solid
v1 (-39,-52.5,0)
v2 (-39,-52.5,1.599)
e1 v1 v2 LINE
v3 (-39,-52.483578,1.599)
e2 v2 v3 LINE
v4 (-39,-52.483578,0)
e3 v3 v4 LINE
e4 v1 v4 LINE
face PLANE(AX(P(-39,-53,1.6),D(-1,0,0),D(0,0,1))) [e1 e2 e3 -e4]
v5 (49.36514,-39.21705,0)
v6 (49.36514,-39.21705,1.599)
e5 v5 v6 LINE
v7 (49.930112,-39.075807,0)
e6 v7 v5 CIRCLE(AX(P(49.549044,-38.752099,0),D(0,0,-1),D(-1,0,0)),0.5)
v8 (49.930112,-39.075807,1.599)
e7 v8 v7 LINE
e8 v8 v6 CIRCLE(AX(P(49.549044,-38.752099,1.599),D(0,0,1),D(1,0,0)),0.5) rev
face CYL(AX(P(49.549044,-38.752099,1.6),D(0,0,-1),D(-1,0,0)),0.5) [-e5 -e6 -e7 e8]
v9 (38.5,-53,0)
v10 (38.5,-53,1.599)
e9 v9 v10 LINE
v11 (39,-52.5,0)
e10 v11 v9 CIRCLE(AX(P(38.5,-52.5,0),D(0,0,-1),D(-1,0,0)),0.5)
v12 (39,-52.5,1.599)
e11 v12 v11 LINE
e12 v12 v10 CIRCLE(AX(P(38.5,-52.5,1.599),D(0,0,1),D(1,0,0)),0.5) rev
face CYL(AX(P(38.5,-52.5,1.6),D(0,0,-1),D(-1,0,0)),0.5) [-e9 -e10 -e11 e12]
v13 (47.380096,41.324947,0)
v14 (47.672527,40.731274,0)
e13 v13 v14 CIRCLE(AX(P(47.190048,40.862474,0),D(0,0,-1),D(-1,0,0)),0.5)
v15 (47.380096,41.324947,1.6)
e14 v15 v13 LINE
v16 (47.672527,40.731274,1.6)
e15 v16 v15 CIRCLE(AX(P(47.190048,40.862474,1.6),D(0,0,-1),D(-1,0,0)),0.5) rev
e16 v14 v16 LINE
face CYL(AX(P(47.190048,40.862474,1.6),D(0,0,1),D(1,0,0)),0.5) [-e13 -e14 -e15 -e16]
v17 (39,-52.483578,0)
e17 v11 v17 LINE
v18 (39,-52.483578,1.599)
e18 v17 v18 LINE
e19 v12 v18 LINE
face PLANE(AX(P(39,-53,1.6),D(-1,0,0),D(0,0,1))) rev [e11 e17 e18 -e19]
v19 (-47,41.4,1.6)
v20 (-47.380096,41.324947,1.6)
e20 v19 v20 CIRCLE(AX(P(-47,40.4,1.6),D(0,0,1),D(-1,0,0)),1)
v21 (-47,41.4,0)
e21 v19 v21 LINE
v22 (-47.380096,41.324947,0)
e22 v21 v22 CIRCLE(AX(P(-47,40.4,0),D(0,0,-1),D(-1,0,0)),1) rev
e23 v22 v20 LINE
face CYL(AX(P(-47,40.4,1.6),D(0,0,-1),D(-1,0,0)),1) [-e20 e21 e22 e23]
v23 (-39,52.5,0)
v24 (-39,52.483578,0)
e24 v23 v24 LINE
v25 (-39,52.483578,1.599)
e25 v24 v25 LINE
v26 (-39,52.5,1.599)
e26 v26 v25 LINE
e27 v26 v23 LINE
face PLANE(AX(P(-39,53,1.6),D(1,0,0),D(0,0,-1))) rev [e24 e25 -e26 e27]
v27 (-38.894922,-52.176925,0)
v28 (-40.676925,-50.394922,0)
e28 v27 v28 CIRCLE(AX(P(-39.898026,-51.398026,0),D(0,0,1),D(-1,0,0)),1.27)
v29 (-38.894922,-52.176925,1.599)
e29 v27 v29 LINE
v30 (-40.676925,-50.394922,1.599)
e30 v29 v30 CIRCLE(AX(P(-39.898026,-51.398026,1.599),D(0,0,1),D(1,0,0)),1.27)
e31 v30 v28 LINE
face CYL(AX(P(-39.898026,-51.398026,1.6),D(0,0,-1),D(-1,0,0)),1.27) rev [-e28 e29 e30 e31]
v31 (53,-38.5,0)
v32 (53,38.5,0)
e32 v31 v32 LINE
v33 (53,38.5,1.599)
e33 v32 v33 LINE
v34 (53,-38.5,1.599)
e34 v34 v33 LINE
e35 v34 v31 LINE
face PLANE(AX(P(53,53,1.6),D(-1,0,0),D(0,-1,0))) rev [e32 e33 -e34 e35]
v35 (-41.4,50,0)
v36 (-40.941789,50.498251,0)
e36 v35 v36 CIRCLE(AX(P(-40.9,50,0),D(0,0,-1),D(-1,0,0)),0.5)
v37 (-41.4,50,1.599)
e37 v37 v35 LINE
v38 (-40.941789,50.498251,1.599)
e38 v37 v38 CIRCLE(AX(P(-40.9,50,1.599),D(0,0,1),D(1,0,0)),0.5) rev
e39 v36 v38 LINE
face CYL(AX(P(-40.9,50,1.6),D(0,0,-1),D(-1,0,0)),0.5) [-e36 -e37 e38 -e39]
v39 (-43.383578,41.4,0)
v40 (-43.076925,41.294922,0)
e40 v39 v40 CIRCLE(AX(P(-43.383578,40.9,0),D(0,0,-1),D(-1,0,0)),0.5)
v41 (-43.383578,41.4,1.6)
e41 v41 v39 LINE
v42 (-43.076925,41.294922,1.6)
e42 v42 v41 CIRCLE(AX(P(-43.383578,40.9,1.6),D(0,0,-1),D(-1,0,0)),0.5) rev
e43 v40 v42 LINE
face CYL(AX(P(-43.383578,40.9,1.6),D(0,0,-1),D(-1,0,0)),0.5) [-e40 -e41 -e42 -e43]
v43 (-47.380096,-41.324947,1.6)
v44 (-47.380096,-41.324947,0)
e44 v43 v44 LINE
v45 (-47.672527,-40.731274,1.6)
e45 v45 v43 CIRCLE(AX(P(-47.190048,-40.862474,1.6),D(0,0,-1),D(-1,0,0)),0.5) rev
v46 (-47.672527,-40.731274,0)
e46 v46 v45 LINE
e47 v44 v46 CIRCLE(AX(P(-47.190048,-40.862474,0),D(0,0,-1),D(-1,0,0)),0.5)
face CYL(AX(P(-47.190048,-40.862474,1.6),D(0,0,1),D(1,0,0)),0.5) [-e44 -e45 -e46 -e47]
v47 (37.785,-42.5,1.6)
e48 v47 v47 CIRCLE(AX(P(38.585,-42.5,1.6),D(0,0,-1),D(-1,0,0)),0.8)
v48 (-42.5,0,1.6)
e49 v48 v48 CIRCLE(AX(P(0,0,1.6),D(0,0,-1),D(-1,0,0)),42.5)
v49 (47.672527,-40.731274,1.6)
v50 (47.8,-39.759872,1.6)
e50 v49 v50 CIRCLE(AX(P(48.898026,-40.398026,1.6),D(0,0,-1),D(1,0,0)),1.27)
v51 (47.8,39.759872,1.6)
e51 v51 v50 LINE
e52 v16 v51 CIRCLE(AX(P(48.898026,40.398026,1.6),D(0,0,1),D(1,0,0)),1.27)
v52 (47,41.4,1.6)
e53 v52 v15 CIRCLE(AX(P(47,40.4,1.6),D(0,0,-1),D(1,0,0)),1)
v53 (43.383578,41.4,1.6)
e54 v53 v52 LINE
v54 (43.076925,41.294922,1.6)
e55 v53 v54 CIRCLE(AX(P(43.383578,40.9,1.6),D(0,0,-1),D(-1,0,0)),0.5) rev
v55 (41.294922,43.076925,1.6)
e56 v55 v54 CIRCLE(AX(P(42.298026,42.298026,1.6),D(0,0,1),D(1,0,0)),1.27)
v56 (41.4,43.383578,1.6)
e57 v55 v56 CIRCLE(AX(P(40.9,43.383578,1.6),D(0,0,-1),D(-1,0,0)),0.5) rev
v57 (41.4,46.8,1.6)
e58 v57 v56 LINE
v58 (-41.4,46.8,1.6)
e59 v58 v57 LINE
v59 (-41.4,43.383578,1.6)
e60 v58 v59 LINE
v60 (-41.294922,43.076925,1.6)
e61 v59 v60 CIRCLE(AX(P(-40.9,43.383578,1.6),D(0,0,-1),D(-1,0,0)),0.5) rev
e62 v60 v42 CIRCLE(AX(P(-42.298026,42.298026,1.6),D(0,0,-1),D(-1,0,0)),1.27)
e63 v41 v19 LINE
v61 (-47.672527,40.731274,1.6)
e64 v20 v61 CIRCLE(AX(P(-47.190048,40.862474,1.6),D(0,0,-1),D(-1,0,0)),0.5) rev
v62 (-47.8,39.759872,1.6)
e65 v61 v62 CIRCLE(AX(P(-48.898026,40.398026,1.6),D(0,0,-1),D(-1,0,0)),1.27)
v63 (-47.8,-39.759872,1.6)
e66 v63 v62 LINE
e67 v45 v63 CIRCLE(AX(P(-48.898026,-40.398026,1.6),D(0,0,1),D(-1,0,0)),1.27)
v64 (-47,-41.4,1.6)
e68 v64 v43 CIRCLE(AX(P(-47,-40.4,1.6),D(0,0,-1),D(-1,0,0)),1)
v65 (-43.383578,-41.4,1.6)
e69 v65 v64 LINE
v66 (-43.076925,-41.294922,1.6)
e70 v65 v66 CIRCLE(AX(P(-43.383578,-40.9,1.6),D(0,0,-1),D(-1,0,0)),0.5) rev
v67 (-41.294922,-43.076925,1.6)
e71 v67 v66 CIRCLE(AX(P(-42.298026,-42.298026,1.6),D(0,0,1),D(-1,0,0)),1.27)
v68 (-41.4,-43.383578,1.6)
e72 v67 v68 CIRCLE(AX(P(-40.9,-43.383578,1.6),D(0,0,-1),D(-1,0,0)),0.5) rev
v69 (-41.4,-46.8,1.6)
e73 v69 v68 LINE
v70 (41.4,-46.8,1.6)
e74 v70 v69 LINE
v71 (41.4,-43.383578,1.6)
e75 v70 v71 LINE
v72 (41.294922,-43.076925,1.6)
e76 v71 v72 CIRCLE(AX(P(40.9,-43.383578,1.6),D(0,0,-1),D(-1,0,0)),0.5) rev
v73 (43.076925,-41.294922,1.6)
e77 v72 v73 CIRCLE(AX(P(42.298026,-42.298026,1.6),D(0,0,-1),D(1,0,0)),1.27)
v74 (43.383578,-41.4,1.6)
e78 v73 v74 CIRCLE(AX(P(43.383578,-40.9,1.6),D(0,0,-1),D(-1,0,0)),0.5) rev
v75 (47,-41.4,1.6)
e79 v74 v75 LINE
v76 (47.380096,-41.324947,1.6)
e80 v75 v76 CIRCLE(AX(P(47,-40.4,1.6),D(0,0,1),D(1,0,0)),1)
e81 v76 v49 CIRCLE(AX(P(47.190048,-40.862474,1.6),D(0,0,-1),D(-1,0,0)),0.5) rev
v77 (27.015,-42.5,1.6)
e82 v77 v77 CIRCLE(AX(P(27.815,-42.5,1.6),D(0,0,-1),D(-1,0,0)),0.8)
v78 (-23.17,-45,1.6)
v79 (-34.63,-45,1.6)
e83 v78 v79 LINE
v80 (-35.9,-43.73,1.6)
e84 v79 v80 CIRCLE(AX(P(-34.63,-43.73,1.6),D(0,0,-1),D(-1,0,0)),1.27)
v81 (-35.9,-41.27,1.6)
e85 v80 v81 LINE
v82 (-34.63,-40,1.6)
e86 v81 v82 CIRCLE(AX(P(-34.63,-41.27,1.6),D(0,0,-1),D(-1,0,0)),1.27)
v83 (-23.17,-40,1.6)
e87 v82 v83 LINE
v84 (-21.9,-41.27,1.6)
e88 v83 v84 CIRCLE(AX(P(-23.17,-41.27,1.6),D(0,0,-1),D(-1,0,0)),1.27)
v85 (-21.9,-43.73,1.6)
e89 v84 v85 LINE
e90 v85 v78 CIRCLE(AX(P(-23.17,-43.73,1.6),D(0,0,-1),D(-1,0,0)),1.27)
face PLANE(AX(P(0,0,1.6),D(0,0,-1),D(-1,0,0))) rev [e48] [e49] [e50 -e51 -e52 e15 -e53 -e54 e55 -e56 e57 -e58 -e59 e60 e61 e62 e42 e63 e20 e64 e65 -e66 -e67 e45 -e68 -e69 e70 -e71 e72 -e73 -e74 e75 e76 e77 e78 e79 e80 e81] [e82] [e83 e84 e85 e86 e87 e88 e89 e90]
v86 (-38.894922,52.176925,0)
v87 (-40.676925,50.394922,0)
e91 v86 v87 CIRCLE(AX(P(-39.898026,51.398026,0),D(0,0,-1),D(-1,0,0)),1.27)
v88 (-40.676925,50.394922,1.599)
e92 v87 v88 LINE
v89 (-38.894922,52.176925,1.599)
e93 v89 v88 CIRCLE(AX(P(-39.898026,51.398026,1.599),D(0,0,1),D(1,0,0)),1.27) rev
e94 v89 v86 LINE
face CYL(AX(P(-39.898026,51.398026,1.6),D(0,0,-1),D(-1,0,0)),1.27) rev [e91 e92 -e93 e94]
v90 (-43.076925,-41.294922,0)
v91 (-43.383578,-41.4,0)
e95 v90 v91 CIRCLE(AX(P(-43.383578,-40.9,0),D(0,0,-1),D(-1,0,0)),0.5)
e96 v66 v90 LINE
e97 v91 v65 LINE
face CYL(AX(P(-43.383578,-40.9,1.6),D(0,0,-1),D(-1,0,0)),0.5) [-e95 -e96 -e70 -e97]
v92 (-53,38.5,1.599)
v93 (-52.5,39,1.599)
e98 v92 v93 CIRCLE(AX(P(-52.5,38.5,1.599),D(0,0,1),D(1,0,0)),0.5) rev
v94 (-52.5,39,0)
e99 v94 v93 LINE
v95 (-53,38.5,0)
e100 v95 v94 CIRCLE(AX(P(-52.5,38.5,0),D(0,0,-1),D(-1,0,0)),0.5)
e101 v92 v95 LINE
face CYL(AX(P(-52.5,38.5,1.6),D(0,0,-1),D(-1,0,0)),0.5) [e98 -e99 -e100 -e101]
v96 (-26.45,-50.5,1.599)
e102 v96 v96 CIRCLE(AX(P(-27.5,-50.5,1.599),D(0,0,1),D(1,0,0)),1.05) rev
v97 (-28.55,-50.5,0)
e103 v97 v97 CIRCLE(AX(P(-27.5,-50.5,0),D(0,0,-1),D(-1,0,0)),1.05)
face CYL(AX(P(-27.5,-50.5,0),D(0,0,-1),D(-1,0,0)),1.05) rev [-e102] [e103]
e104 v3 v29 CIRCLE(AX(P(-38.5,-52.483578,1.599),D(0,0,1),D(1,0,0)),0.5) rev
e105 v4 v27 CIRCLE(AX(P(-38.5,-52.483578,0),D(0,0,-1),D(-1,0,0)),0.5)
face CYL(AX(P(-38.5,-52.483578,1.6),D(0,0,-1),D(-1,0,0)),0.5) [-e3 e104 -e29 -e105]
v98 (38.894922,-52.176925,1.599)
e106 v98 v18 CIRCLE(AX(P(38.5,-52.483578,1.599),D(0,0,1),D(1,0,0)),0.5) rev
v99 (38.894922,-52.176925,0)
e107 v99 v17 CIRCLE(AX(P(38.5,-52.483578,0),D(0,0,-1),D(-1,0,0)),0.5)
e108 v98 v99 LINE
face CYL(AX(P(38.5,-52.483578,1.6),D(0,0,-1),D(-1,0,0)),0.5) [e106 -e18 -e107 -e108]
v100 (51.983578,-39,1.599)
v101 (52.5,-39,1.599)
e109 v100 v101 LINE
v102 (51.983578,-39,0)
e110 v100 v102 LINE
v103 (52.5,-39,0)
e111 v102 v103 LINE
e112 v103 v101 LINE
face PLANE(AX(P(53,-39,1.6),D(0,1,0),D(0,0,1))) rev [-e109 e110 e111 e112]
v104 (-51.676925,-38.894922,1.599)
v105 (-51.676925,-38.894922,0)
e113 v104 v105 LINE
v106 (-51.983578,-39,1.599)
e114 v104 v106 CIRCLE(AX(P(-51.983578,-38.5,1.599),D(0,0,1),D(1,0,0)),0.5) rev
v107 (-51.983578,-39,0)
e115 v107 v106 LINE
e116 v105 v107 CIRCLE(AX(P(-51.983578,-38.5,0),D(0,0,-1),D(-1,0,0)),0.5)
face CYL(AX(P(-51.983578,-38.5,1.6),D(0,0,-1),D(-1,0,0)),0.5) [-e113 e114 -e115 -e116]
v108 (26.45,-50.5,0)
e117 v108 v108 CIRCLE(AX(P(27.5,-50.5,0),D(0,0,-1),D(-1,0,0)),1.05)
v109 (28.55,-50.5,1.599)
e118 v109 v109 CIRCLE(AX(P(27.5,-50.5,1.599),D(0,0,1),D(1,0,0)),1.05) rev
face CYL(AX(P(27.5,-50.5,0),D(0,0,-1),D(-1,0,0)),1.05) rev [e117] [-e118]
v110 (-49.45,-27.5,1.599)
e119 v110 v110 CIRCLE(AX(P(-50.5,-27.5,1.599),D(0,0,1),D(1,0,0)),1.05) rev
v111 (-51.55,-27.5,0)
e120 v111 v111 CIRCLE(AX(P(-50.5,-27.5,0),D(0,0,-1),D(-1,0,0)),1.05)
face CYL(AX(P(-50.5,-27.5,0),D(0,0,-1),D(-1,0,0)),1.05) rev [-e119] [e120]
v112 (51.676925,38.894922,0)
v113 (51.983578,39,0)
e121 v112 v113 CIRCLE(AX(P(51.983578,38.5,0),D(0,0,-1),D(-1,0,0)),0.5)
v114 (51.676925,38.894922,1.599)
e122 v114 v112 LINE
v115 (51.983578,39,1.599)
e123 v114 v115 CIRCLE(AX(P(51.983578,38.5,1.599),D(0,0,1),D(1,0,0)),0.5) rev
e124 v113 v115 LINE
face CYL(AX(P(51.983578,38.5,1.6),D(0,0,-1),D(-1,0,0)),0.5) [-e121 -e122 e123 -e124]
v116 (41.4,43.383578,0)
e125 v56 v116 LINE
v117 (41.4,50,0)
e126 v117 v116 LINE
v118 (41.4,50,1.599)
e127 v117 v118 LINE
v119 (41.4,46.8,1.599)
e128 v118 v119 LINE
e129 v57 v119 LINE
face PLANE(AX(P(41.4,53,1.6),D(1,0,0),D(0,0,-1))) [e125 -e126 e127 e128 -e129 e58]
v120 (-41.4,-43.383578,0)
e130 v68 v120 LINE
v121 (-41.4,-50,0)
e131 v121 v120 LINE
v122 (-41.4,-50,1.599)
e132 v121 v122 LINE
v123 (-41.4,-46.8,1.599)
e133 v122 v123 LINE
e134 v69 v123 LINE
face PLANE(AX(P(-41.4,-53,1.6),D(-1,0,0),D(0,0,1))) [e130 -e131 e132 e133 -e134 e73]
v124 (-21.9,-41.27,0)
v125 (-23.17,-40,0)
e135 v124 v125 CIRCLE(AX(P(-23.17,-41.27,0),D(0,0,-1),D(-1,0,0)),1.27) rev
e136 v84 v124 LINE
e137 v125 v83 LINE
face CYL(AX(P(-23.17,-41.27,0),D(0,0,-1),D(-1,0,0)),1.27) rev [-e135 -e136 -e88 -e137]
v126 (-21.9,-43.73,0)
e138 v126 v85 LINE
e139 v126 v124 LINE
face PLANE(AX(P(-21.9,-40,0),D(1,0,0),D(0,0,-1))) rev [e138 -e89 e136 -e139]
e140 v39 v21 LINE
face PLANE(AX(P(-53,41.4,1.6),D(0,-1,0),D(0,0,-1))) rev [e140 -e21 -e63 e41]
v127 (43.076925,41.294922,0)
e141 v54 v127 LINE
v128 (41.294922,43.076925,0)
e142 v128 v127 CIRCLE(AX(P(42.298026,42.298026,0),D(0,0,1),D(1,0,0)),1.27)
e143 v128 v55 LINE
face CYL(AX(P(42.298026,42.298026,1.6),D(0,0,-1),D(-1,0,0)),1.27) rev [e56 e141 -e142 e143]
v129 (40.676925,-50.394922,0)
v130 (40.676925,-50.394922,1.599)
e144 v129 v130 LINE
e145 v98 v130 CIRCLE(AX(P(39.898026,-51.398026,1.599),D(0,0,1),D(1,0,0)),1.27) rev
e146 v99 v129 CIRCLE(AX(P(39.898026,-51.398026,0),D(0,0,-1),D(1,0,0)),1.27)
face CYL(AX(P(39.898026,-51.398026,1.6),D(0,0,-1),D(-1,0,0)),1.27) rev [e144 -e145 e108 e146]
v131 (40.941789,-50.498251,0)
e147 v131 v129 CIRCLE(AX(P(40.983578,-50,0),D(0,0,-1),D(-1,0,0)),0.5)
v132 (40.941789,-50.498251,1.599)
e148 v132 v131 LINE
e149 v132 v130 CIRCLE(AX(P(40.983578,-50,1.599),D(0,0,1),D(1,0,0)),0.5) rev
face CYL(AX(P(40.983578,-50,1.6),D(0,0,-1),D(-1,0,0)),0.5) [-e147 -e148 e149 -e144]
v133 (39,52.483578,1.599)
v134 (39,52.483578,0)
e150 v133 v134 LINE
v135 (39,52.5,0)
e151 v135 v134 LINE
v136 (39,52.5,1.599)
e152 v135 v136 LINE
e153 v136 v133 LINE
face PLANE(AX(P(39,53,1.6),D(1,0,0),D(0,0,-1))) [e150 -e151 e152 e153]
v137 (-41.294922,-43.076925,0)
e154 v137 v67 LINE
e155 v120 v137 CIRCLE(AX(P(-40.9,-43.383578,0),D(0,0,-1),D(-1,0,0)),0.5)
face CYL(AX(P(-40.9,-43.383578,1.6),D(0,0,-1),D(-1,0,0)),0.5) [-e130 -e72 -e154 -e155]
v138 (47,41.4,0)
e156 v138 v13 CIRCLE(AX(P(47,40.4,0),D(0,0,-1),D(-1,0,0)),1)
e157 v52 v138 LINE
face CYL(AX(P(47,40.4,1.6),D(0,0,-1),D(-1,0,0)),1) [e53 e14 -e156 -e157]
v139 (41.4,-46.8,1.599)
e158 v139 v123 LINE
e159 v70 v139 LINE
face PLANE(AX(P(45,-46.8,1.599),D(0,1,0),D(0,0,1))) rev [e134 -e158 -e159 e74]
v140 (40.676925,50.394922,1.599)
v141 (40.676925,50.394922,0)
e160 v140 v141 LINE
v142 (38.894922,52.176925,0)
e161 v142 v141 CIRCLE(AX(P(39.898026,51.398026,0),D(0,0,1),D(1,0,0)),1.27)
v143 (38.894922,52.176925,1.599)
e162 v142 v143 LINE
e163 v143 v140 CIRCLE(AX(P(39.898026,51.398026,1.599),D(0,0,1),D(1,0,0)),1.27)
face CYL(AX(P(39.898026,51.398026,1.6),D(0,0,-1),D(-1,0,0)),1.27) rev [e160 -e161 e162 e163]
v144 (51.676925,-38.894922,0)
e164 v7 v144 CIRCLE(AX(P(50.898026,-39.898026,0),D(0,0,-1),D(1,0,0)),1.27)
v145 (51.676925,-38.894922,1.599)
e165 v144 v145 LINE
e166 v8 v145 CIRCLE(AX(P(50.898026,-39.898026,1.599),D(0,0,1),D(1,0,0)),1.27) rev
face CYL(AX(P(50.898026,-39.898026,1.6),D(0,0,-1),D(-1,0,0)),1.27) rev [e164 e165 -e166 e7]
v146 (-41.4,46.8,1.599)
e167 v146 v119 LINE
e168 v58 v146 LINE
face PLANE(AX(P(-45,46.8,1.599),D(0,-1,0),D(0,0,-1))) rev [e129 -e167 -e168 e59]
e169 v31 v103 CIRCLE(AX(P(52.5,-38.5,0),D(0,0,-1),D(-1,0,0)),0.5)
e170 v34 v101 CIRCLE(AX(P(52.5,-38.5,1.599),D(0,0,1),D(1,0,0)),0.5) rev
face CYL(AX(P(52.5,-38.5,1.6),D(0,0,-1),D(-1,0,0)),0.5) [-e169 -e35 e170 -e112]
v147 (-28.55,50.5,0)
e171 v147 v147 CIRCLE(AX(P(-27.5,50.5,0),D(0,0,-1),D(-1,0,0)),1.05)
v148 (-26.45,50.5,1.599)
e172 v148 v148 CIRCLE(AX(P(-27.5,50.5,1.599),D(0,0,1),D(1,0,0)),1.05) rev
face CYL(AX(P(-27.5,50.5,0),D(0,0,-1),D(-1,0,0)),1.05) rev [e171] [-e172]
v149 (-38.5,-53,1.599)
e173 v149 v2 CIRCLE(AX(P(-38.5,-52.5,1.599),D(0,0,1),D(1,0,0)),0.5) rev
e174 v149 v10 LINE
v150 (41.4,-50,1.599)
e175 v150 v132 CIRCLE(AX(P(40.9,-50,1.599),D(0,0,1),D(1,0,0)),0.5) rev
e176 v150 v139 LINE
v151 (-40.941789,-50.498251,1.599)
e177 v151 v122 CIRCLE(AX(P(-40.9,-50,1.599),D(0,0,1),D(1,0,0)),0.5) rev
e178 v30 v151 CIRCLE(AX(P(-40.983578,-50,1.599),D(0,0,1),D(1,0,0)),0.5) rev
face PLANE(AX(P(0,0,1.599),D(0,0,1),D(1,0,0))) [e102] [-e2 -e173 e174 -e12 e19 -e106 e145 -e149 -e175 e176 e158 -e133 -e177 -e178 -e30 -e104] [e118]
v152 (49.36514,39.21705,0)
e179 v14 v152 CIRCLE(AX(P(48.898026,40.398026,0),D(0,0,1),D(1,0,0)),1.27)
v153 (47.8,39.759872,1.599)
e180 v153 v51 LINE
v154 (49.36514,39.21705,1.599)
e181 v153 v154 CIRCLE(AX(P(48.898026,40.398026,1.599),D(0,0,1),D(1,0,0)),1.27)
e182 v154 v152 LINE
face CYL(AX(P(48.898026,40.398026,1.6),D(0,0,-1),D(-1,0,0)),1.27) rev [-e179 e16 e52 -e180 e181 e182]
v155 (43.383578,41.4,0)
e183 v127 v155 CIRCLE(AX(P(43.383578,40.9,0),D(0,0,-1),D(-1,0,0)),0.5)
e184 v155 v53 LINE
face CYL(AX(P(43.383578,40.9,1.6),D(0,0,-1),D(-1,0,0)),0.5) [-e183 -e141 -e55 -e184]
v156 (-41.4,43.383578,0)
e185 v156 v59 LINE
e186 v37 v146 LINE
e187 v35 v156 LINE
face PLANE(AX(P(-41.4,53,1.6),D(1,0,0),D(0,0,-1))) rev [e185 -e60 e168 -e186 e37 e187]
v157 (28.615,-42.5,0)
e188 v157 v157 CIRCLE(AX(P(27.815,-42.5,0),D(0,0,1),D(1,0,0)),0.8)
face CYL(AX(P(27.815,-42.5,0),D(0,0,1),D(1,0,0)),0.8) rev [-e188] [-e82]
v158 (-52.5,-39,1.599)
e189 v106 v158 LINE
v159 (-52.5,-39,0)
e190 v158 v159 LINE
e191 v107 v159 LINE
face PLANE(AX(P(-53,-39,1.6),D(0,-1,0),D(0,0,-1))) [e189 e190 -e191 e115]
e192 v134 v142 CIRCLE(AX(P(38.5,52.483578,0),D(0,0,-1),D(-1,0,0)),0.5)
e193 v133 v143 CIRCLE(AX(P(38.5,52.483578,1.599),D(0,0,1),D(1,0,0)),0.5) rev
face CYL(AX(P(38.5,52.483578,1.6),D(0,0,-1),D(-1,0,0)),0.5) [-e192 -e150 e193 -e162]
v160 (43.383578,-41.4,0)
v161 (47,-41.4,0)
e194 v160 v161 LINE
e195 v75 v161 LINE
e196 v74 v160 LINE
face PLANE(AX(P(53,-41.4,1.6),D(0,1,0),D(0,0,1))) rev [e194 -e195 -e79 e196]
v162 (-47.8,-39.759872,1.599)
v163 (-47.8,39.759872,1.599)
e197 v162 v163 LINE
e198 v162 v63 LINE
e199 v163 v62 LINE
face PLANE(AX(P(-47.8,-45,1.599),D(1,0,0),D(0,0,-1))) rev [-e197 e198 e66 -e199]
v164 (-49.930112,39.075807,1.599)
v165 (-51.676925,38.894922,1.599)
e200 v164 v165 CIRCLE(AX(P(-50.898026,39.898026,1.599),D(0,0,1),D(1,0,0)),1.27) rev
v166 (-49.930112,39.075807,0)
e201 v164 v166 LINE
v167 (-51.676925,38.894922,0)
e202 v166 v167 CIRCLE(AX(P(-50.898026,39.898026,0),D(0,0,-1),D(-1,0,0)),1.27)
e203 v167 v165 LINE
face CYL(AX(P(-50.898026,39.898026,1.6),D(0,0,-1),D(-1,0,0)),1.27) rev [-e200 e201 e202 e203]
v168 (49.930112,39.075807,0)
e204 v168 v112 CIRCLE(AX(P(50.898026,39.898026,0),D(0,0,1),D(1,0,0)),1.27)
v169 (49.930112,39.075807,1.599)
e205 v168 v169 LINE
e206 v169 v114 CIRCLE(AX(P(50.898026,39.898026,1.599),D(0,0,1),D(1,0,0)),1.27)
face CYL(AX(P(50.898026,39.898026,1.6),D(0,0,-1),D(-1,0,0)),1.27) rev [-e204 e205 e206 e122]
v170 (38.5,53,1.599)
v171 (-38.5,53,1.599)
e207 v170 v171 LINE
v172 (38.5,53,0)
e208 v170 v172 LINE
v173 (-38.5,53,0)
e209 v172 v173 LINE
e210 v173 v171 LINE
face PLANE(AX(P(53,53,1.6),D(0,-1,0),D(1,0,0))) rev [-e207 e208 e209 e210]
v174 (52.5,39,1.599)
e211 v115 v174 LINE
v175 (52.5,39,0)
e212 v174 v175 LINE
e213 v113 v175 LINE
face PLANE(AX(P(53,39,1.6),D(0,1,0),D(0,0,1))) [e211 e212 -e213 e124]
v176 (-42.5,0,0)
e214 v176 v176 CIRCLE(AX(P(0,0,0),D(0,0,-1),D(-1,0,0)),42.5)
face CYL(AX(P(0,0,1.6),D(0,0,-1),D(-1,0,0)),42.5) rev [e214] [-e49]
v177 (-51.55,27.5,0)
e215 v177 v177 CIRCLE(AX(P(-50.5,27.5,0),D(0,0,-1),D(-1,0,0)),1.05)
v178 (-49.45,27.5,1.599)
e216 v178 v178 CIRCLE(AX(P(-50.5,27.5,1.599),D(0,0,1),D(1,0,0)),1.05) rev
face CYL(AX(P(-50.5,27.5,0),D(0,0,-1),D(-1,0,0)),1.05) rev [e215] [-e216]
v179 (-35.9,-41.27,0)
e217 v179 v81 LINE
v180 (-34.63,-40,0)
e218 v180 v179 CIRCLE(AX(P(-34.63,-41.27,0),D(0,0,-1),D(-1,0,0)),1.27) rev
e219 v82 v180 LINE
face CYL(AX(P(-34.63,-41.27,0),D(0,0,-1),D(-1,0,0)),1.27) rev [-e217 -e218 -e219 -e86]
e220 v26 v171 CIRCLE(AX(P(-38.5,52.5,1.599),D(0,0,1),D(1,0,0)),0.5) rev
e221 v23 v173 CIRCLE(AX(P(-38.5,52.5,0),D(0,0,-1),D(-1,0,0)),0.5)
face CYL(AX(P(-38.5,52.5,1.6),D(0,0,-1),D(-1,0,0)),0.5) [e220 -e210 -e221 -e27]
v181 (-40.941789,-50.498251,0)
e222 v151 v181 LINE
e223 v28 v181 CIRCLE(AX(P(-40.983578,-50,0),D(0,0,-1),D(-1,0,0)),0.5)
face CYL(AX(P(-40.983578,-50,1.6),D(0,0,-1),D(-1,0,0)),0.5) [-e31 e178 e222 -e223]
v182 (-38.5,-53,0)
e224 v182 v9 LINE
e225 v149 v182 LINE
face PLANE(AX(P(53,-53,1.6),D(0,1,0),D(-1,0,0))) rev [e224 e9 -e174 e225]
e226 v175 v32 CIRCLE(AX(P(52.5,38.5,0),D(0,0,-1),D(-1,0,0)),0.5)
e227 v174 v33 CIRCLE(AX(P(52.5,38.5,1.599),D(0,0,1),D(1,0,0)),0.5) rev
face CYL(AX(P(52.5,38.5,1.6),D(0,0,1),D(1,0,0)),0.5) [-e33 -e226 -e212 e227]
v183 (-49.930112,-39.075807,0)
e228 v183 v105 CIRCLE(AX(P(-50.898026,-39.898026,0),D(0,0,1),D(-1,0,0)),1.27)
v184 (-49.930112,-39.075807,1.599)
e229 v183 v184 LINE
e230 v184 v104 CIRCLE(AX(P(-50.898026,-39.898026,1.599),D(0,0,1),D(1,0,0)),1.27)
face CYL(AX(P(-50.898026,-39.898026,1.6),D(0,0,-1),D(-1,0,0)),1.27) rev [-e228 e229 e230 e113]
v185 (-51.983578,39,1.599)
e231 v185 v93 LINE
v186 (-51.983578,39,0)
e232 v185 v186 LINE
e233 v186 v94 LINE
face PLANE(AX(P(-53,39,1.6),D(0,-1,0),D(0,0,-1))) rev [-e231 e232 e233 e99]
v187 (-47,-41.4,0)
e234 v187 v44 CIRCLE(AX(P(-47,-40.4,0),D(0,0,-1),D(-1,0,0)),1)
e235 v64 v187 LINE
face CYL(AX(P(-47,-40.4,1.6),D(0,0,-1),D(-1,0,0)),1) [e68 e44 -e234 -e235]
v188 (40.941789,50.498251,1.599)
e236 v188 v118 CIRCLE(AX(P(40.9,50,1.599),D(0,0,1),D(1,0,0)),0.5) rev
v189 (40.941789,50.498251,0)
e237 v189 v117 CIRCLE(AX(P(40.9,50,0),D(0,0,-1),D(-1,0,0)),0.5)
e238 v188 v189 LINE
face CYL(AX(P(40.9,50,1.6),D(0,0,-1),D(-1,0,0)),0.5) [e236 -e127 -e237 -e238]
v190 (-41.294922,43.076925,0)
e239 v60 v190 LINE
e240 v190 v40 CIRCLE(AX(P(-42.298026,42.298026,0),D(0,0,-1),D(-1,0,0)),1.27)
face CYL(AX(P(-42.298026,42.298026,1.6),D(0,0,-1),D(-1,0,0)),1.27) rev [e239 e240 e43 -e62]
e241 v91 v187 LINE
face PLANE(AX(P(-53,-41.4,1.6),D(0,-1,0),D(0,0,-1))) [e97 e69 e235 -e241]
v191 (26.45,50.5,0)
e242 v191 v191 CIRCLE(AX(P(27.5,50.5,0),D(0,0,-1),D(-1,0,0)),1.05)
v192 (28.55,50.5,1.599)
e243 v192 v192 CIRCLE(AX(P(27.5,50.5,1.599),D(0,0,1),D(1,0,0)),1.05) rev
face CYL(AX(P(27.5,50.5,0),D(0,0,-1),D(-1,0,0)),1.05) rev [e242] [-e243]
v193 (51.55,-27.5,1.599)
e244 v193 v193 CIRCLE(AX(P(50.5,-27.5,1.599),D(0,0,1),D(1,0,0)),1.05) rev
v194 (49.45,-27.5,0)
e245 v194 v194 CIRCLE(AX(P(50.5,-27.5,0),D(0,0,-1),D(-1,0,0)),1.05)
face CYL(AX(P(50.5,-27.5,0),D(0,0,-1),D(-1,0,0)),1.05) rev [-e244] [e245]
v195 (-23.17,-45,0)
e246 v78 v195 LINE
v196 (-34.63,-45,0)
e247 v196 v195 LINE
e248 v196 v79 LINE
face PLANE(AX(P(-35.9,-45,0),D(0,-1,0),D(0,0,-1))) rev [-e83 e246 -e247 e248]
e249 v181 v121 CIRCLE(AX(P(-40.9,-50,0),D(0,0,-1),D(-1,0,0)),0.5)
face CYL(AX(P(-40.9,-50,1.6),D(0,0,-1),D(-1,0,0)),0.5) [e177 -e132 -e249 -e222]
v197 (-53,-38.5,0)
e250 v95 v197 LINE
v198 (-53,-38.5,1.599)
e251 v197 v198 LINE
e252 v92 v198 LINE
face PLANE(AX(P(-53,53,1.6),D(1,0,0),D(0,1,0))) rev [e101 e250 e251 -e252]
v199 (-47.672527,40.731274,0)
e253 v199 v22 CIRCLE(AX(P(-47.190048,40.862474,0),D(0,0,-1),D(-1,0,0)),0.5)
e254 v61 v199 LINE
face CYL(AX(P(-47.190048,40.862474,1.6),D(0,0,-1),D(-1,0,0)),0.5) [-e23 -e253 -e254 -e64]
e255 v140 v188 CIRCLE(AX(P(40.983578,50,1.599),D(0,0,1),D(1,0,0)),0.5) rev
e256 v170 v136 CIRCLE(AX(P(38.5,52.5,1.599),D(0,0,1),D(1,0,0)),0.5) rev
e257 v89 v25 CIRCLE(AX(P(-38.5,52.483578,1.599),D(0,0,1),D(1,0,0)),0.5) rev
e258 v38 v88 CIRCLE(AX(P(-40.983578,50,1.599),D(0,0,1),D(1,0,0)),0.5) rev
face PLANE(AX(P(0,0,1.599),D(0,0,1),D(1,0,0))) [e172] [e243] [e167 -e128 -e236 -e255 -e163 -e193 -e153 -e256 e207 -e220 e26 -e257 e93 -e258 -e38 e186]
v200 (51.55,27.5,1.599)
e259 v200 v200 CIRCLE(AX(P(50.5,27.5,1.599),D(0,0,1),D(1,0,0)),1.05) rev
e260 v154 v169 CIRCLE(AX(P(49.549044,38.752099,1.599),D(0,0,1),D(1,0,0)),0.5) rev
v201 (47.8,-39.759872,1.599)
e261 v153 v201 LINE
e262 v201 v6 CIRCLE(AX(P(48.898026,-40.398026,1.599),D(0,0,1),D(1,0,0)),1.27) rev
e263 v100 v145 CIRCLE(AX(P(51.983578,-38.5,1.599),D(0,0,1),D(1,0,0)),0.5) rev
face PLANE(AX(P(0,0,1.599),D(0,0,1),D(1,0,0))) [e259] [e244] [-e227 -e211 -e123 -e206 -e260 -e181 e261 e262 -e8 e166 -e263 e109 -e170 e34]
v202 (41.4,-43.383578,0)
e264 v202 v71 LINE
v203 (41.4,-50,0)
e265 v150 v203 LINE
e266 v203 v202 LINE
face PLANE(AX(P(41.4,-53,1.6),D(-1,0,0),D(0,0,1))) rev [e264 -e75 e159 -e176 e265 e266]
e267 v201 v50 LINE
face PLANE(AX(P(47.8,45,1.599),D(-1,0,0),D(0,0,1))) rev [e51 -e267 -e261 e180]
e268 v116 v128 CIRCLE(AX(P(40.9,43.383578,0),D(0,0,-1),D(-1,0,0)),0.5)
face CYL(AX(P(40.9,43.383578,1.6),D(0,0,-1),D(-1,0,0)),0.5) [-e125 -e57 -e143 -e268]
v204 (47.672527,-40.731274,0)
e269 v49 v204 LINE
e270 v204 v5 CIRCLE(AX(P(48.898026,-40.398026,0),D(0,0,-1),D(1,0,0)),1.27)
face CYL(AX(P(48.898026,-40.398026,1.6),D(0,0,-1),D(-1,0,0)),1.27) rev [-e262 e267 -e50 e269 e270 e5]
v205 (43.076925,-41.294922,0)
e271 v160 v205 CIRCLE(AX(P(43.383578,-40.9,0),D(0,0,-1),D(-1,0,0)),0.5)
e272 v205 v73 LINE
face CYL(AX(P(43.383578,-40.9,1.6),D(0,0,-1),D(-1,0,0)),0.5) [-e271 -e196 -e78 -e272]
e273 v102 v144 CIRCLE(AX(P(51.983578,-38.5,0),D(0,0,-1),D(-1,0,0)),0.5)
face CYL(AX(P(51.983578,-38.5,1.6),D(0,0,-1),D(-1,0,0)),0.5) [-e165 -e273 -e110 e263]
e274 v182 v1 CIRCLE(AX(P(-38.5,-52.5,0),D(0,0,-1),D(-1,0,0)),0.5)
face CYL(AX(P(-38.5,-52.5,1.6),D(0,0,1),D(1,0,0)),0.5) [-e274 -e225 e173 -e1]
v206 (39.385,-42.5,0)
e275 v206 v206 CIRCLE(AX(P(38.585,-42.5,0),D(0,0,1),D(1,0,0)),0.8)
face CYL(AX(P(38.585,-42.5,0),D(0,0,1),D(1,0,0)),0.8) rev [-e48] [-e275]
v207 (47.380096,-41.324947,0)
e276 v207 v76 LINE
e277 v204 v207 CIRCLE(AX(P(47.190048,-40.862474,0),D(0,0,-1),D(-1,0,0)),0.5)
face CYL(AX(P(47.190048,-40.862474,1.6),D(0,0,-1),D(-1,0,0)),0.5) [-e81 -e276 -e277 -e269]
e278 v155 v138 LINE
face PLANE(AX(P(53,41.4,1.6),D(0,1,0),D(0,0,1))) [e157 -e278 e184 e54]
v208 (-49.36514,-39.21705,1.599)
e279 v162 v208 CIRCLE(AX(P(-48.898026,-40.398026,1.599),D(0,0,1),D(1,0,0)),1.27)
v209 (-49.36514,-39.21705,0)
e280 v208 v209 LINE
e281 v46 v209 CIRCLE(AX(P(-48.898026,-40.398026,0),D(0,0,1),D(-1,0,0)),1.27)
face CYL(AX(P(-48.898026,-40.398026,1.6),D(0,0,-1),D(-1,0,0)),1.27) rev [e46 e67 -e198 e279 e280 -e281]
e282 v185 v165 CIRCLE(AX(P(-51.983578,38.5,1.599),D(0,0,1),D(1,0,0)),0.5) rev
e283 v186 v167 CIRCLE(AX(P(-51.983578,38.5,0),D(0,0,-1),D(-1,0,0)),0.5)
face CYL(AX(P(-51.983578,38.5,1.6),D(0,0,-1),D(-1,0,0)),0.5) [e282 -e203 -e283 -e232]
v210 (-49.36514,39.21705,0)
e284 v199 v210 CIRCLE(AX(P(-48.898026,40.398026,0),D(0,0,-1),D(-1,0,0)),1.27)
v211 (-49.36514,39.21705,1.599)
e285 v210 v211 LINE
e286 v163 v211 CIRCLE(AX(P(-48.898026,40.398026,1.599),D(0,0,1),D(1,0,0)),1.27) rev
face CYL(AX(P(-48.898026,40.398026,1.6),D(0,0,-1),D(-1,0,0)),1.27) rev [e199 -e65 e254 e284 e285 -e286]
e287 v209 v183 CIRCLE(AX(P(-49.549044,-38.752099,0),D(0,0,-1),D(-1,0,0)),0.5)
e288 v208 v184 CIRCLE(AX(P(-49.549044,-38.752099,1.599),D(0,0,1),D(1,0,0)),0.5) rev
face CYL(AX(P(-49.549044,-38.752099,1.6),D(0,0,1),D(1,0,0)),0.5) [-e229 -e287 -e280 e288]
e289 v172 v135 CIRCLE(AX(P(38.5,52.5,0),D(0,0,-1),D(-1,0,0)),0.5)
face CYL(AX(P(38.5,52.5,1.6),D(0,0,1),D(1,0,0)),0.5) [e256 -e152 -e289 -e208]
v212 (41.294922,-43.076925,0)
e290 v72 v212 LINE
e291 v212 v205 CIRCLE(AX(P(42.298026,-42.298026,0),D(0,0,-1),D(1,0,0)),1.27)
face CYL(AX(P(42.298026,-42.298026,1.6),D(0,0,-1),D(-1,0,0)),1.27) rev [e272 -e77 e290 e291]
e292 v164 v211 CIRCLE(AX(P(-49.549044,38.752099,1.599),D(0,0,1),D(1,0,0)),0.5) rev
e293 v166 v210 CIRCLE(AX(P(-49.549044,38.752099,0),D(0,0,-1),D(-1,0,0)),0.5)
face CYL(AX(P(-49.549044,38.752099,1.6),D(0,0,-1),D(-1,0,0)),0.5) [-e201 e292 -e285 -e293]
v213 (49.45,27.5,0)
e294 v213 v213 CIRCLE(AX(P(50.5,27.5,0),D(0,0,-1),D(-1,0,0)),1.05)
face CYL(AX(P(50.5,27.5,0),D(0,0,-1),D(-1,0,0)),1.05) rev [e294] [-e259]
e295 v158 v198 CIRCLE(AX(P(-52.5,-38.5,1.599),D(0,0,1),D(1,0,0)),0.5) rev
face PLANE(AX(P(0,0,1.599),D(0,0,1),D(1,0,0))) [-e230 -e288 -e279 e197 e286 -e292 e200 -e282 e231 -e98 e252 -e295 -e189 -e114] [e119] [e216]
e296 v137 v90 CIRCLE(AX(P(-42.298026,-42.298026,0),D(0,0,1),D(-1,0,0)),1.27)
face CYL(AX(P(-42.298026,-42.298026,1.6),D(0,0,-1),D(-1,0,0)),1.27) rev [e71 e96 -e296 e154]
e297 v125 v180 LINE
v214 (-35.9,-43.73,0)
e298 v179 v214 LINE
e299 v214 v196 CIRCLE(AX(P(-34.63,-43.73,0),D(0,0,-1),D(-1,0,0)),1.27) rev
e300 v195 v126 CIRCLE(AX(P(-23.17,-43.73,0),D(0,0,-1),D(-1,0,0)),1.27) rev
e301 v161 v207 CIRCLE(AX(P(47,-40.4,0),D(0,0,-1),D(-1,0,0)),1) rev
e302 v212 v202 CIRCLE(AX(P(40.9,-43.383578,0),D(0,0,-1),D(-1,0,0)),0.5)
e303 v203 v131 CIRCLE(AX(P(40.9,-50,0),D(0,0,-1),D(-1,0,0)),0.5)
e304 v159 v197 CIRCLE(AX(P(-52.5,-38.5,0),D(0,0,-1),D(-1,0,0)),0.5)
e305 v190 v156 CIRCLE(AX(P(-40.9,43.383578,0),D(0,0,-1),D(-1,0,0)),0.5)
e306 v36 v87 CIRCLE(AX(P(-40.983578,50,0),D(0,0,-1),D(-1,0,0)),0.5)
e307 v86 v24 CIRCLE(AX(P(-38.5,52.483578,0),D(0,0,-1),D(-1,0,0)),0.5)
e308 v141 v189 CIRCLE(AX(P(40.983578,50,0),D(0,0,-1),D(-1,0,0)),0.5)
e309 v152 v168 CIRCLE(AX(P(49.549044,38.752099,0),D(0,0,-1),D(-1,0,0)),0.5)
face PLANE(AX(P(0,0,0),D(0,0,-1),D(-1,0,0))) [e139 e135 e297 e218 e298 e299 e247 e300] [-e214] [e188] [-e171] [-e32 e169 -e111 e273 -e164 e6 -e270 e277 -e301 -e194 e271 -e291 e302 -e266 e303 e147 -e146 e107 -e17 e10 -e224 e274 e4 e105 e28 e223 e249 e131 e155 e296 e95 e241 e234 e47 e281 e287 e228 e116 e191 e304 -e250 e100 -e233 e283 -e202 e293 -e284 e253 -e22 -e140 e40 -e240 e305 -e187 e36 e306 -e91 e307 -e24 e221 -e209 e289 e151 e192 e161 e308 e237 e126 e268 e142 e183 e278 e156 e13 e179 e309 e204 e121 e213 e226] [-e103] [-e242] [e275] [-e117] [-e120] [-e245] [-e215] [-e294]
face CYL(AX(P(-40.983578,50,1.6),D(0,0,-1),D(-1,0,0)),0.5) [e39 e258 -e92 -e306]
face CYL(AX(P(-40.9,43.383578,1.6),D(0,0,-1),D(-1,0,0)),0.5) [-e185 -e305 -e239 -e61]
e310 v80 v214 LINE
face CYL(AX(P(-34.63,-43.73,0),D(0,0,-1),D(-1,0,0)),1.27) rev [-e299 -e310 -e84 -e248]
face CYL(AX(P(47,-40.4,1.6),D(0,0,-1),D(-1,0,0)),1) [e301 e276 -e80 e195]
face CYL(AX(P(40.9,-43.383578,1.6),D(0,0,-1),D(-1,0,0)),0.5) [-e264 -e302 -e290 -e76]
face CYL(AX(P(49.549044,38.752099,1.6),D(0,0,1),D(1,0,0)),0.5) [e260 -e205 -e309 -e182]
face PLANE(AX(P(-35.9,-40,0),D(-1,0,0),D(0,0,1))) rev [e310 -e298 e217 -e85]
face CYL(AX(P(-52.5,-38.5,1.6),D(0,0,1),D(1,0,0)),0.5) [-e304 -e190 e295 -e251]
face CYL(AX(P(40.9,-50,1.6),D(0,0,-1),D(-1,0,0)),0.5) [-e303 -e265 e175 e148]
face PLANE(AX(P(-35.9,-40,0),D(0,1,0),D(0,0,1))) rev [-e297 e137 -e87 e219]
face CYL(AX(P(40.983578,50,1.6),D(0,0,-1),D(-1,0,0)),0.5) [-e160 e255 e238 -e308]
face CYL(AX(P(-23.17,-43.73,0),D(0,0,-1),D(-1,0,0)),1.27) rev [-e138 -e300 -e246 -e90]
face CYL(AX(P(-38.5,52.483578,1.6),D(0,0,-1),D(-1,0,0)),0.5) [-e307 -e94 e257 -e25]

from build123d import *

# Parameters (mm, degrees)
SKETCH1_W                           = 106
SKETCH1_H                           = 106
MAINOUTLINE_DEPTH                   = 1.6
SKETCH4_W                           = 11.6
SKETCH4_H                           = 11.6
RAILCUTOUTS_DEPTH                   = 75.970394157
SKETCH13_W                          = 2.4
SKETCH13_H                          = 2.5
FILLETCUTOUTS_DEPTH                 = 75.970394157
DOGBONE_DEPTH                       = 75.970394157
SKETCH_PATTERN1_DEPTH               = 1.6
MIRROR2_COPY_1_SKETCH_W             = 11.6
MIRROR2_COPY_1_SKETCH_H             = 11.6
MIRROR2_COPY_1_DEPTH                = 75.970394157
MIRROR2_COPY_2_SKETCH_W             = 2.4
MIRROR2_COPY_2_SKETCH_H             = 2.5
MIRROR2_COPY_2_DEPTH                = 75.970394157
MIRROR2_COPY_3_DEPTH                = 75.970394157
MIRROR2_COPY_4_DEPTH                = 1.6
FILLET1_R                           = 0.5
M2_CLEARANCE_HOLE1_D                = 2.1
INTERBOARDCONNECTORHOLES_DEPTH      = 75.970394157
INTERBOARDCONNECTORHOLES_DEPTH_BACK = 75.970394157
SKETCH12_R                          = 0.8
CUT_EXTRUDE7_DEPTH                  = 75.970394157
CUT_EXTRUDE7_DEPTH_BACK             = 75.970394157
SKETCH17_W                          = 14
SKETCH17_H                          = 5
FILLET2_R                           = 1.27
CUT_EXTRUDE1_DEPTH                  = 75.970394157
CUT_EXTRUDE1_DEPTH_BACK             = 75.970394157
SKETCH10_R                          = 42.5
SKETCH16_W                          = 90
SKETCH16_H                          = 6.2
SKETCH16_W_2                        = 5.2
SKETCH16_H_2                        = 90
CUT_EXTRUDE6_DEPTH                  = 0.001


# Read off the part's stored shape, not the designer's step: Sketch-Pattern1
with BuildPart() as part:
    # Sketch1 → mainOutline (new body)
    with BuildSketch(Plane.XY):
        Rectangle(SKETCH1_W, SKETCH1_H)
    extrude(amount=MAINOUTLINE_DEPTH)

    # Sketch4 → railCutouts (cut, through all)
    with BuildSketch(Plane(origin=(0, 0, 0), x_dir=(-1, 0, 0), z_dir=(0, 0, -1))):
        with Locations((47.2, 47.2)):
            Rectangle(SKETCH4_W, SKETCH4_H)
    railcutouts = extrude(amount=-RAILCUTOUTS_DEPTH, mode=Mode.SUBTRACT)

    # Sketch13 → filletCutouts (cut, symmetric)
    with BuildSketch(Plane(origin=(0, 0, 0), x_dir=(-1, 0, 0), z_dir=(0, 0, -1))):
        with BuildLine():
            Line((48, 39.5), (48, 40.4))
            ThreePointArc((48, 40.4), (47.707106781, 41.107106781), (47, 41.4))
            Line((47, 41.4), (53, 41.4))
            Line((53, 41.4), (53, 39))
            Line((53, 39), (50, 39))
            Line((50, 39), (50, 39.5))
            Line((50, 39.5), (48, 39.5))
        make_face()
        with Locations((40.2, 51.75)):
            Rectangle(SKETCH13_W, SKETCH13_H)
    filletcutouts = extrude(amount=FILLETCUTOUTS_DEPTH, both=True, mode=Mode.SUBTRACT)

    # Sketch5 → dogbone (cut, through all)
    with BuildSketch(Plane(origin=(0, 0, 0), x_dir=(-1, 0, 0), z_dir=(0, 0, -1))):
        with BuildLine():
            Line((41.4, 43.196051224), (44.582309033, 46.378360258))
            ThreePointArc((44.582309033, 46.378360258), (46.378360258, 46.378360258), (46.378360258, 44.582309033))
            Line((46.378360258, 44.582309033), (43.196051224, 41.4))
            ThreePointArc((43.196051224, 41.4), (41.4, 41.4), (41.4, 43.196051224))
        make_face()
    dogbone = extrude(amount=-DOGBONE_DEPTH, mode=Mode.SUBTRACT)

    # Sketch-Pattern1 outline → Sketch-Pattern1 (cut)
    with BuildSketch(Plane.XY):
        with BuildLine():
            ThreePointArc((-51.796051224, 39), (-50.898025612, 38.628025612), (-50, 39))
            Line((-50, 39), (-51.796051224, 39))
        make_face()
        with BuildLine():
            Line((-48, 40.4), (-48, 39.5))
            ThreePointArc((-48, 39.5), (-47.640251053, 40.222232671), (-47.788196764, 41.015423319))
            ThreePointArc((-47.788196764, 41.015423319), (-47.945567756, 40.725425288), (-48, 40.4))
        make_face()
        with BuildLine():
            ThreePointArc((-50, 39), (-49.837206518, 39.199768603), (-49.718090983, 39.428287097))
            ThreePointArc((-49.718090983, 39.428287097), (-48.845062088, 39.129130476), (-48, 39.5))
            Line((-48, 39.5), (-50, 39.5))
            Line((-50, 39.5), (-50, 39))
        make_face()
        with BuildLine():
            ThreePointArc((-40.796051224, 50.5), (-39.898025612, 50.128025612), (-39, 50.5))
            Line((-39, 50.5), (-40.796051224, 50.5))
        make_face()
        with BuildLine():
            ThreePointArc((-39, 50.5), (-38.628025612, 51.398025612), (-39, 52.296051224))
            Line((-39, 52.296051224), (-39, 50.5))
        make_face()
    sketch_pattern1 = extrude(amount=SKETCH_PATTERN1_DEPTH, mode=Mode.SUBTRACT)

    # Mirror1: railCutouts, filletCutouts, dogbone, Sketch-Pattern1 across plane
    add(railcutouts.mirror(Plane(origin=(0, 0, 0), x_dir=(0, 0, 1), z_dir=(1, 0, 0))), mode=Mode.SUBTRACT)
    add(filletcutouts.mirror(Plane(origin=(0, 0, 0), x_dir=(0, 0, 1), z_dir=(1, 0, 0))), mode=Mode.SUBTRACT)
    add(dogbone.mirror(Plane(origin=(0, 0, 0), x_dir=(0, 0, 1), z_dir=(1, 0, 0))), mode=Mode.SUBTRACT)
    add(sketch_pattern1.mirror(Plane(origin=(0, 0, 0), x_dir=(0, 0, 1), z_dir=(1, 0, 0))), mode=Mode.SUBTRACT)

    # Mirror2: railCutouts, filletCutouts, dogbone, Sketch-Pattern1 across plane
    add(railcutouts.mirror(Plane.ZX), mode=Mode.SUBTRACT)
    add(filletcutouts.mirror(Plane.ZX), mode=Mode.SUBTRACT)
    add(dogbone.mirror(Plane.ZX), mode=Mode.SUBTRACT)
    add(sketch_pattern1.mirror(Plane.ZX), mode=Mode.SUBTRACT)

    # Mirror2 copy 1 sketch → Mirror2 copy 1 (cut, through all)
    with BuildSketch(Plane(origin=(0, 0, 0), x_dir=(1, 0, 0), z_dir=(0, 0, -1))):
        with Locations((47.2, 47.2)):
            Rectangle(MIRROR2_COPY_1_SKETCH_W, MIRROR2_COPY_1_SKETCH_H)
    extrude(amount=-MIRROR2_COPY_1_DEPTH, mode=Mode.SUBTRACT)

    # Mirror2 copy 2 sketch → Mirror2 copy 2 (cut, symmetric)
    with BuildSketch(Plane(origin=(0, 0, 0), x_dir=(1, 0, 0), z_dir=(0, 0, -1))):
        with BuildLine():
            Line((48, 39.5), (48, 40.4))
            ThreePointArc((48, 40.4), (47.707106781, 41.107106781), (47, 41.4))
            Line((47, 41.4), (53, 41.4))
            Line((53, 41.4), (53, 39))
            Line((53, 39), (50, 39))
            Line((50, 39), (50, 39.5))
            Line((50, 39.5), (48, 39.5))
        make_face()
        with Locations((40.2, 51.75)):
            Rectangle(MIRROR2_COPY_2_SKETCH_W, MIRROR2_COPY_2_SKETCH_H)
    extrude(amount=MIRROR2_COPY_2_DEPTH, both=True, mode=Mode.SUBTRACT)

    # Mirror2 copy 3 sketch → Mirror2 copy 3 (cut, through all)
    with BuildSketch(Plane(origin=(0, 0, 0), x_dir=(1, 0, 0), z_dir=(0, 0, -1))):
        with BuildLine():
            Line((41.4, 43.196051224), (44.582309033, 46.378360258))
            ThreePointArc((44.582309033, 46.378360258), (46.378360258, 46.378360258), (46.378360258, 44.582309033))
            Line((46.378360258, 44.582309033), (43.196051224, 41.4))
            ThreePointArc((43.196051224, 41.4), (41.4, 41.4), (41.4, 43.196051224))
        make_face()
    extrude(amount=-MIRROR2_COPY_3_DEPTH, mode=Mode.SUBTRACT)

    # Mirror2 copy 4 sketch → Mirror2 copy 4 (cut)
    with BuildSketch(Plane(origin=(0, 0, 0), x_dir=(-1, 0, 0), z_dir=(0, 0, 1))):
        with BuildLine():
            ThreePointArc((-51.796051224, 39), (-50.898025612, 38.628025612), (-50, 39))
            Line((-50, 39), (-51.796051224, 39))
        make_face()
        with BuildLine():
            Line((-48, 40.4), (-48, 39.5))
            ThreePointArc((-48, 39.5), (-47.640251053, 40.222232671), (-47.788196764, 41.015423319))
            ThreePointArc((-47.788196764, 41.015423319), (-47.945567756, 40.725425288), (-48, 40.4))
        make_face()
        with BuildLine():
            ThreePointArc((-50, 39), (-49.837206518, 39.199768603), (-49.718090983, 39.428287097))
            ThreePointArc((-49.718090983, 39.428287097), (-48.845062088, 39.129130476), (-48, 39.5))
            Line((-48, 39.5), (-50, 39.5))
            Line((-50, 39.5), (-50, 39))
        make_face()
        with BuildLine():
            ThreePointArc((-40.796051224, 50.5), (-39.898025612, 50.128025612), (-39, 50.5))
            Line((-39, 50.5), (-40.796051224, 50.5))
        make_face()
        with BuildLine():
            ThreePointArc((-39, 50.5), (-38.628025612, 51.398025612), (-39, 52.296051224))
            Line((-39, 52.296051224), (-39, 50.5))
        make_face()
    extrude(amount=MIRROR2_COPY_4_DEPTH, mode=Mode.SUBTRACT)

    # Fillet1
    # the kernel refuses this fillet: 0.5 mm, written as the material it takes off along each edge
    with BuildSketch(Plane(origin=(-40.796051224, 50.5, -0.468817401), x_dir=(-1, 0, 0), z_dir=(0, 0, 1)), Plane(origin=(41.4, 43.196051224, -0.468817401), x_dir=(0, 1, 0), z_dir=(0, 0, 1)), Plane(origin=(39, 52.296051224, -0.468817401), x_dir=(0, 1, 0), z_dir=(0, 0, 1)), Plane(origin=(43.196051224, -41.4, -0.468817401), x_dir=(1, 0, 0), z_dir=(0, 0, 1)), Plane(origin=(40.796051224, -50.5, -0.468817401), x_dir=(1, 0, 0), z_dir=(0, 0, 1)), Plane(origin=(51.796051224, -39, -0.468817401), x_dir=(1, 0, 0), z_dir=(0, 0, 1)), Plane(origin=(-41.4, -43.196051224, -0.468817401), x_dir=(0, -1, 0), z_dir=(0, 0, 1)), Plane(origin=(-39, -52.296051224, -0.468817401), x_dir=(0, -1, 0), z_dir=(0, 0, 1)), Plane(origin=(-43.196051224, 41.4, -0.468817401), x_dir=(-1, 0, 0), z_dir=(0, 0, 1))) as fillet1_piece_1:
        with BuildLine():
            CenterArc((0.187526961, 0.5), FILLET1_R, 232.171026852, 37.828973148)
            ThreePointArc((-0.119126309, 0.105077511), (-0.057918706, 0.054403066), (0, 0))
            Line((0, 0), (0.187526961, 0))
        make_face()
    extrude(amount=2.537634803, mode=Mode.SUBTRACT)
    with BuildSketch(Plane(origin=(-39, 52.296051224, -0.468817401), x_dir=(0, 1, 0), z_dir=(0, 0, 1))) as fillet1_piece_2:
        with BuildLine():
            CenterArc((0.187526961, -0.5), FILLET1_R, 90, 37.828973148)
            ThreePointArc((-0.119126309, -0.105077511), (-0.057918706, -0.054403066), (0, 0))
            Line((0, 0), (0.187526961, 0))
        make_face()
    extrude(amount=2.537634803, mode=Mode.SUBTRACT)
    with BuildSketch(Plane(origin=(-49.718090983, 39.428287097, -1.02833381), x_dir=(-0.5154483763145984, -0.8569206330545696, 0), z_dir=(0, 0, 1)), Plane(origin=(49.718090983, 39.428287097, -1.02833381), x_dir=(-0.8580641587400395, -0.5135425001747647, 0), z_dir=(0, 0, 1)), Plane(origin=(49.718090983, -39.428287097, -1.02833381), x_dir=(0.5154483763145984, 0.8569206330545696, 0), z_dir=(0, 0, 1)), Plane(origin=(-49.718090983, -39.428287097, -1.02833381), x_dir=(0.8580641587400395, 0.5135425001747647, 0), z_dir=(0, 0, 1))) as fillet1_piece_3:
        with BuildLine():
            CenterArc((0.49230469, 0.493400112), FILLET1_R, 189.447000606, 71.233345199)
            ThreePointArc((-0.000914235, 0.411332508), (0.016306557, 0.205703513), (0, 0))
            ThreePointArc((0, 0), (0.205666762, 0.016763716), (0.411333524, 0))
        make_face()
    extrude(amount=3.65666762, mode=Mode.SUBTRACT)
    with BuildSketch(Plane(origin=(-51.796051224, 39, -0.468817401), x_dir=(0.74994384051794, -0.6615015011843909, 0), z_dir=(0, 0, 1))) as fillet1_piece_4:
        with BuildLine():
            CenterArc((0.190116062, -0.499021286), FILLET1_R, 93.585513434, 37.828973148)
            Line((-0.140634689, -0.124049366), (0, 0))
            ThreePointArc((0, 0), (0.079423486, -0.002485933), (0.158846972, 0))
        make_face()
    extrude(amount=2.537634803, mode=Mode.SUBTRACT)
    with BuildSketch(Plane(origin=(53, 39, -1.25), x_dir=(-1, 0, 0), z_dir=(0, 0, 1)), Plane(origin=(41.4, 50.5, -1.25), x_dir=(-1, 0, 0), z_dir=(0, 0, 1)), Plane(origin=(53, -39, -1.25), x_dir=(0, 1, 0), z_dir=(0, 0, 1)), Plane(origin=(41.4, -50.5, -1.25), x_dir=(0, 1, 0), z_dir=(0, 0, 1)), Plane(origin=(-53, 39, -1.25), x_dir=(0, -1, 0), z_dir=(0, 0, 1)), Plane(origin=(-53, -39, -1.25), x_dir=(1, 0, 0), z_dir=(0, 0, 1)), Plane(origin=(-41.4, -50.5, -1.25), x_dir=(1, 0, 0), z_dir=(0, 0, 1)), Plane(origin=(-41.4, 50.5, -1.25), x_dir=(0, -1, 0), z_dir=(0, 0, 1)), Plane(origin=(-39, 53, 2.85), x_dir=(1, 0, 0), z_dir=(0, 0, -1))) as fillet1_piece_5:
        with BuildLine():
            CenterArc((FILLET1_R, FILLET1_R), FILLET1_R, 180, 90)
            Line((0, FILLET1_R), (0, 0))
            Line((0, 0), (FILLET1_R, 0))
        make_face()
    extrude(amount=4.1, mode=Mode.SUBTRACT)
    with BuildSketch(Plane(origin=(39, 53, 2.85), x_dir=(-1, 0, 0), z_dir=(0, 0, -1)), Plane(origin=(39, -53, 2.85), x_dir=(0, 1, 0), z_dir=(0, 0, -1)), Plane(origin=(-39, -53, 2.85), x_dir=(1, 0, 0), z_dir=(0, 0, -1))) as fillet1_piece_6:
        with BuildLine():
            CenterArc((FILLET1_R, -FILLET1_R), FILLET1_R, 90, 90)
            Line((0, -FILLET1_R), (0, 0))
            Line((0, 0), (FILLET1_R, 0))
        make_face()
    extrude(amount=4.1, mode=Mode.SUBTRACT)
    with BuildSketch(Plane(origin=(43.196051224, 41.4, -0.468817401), x_dir=(-0.7499438406786088, -0.6615015010022407, 0), z_dir=(0, 0, 1)), Plane(origin=(40.796051224, 50.5, -0.468817401), x_dir=(-0.7499438405179647, -0.6615015011843627, 0), z_dir=(0, 0, 1)), Plane(origin=(51.796051224, 39, -0.468817401), x_dir=(-0.74994384051794, -0.6615015011843909, 0), z_dir=(0, 0, 1)), Plane(origin=(41.4, -43.196051224, -0.468817401), x_dir=(-0.6615015010022215, 0.7499438406786257, 0), z_dir=(0, 0, 1)), Plane(origin=(39, -52.296051224, -0.468817401), x_dir=(-0.6615015011843849, 0.7499438405179452, 0), z_dir=(0, 0, 1)), Plane(origin=(-43.196051224, -41.4, -0.468817401), x_dir=(0.7499438406786088, 0.6615015010022407, 0), z_dir=(0, 0, 1)), Plane(origin=(-40.796051224, -50.5, -0.468817401), x_dir=(0.7499438405179647, 0.6615015011843627, 0), z_dir=(0, 0, 1)), Plane(origin=(-51.796051224, -39, -0.468817401), x_dir=(0.74994384051794, 0.6615015011843909, 0), z_dir=(0, 0, 1)), Plane(origin=(-41.4, 43.196051224, -0.468817401), x_dir=(0.6615015010022215, -0.7499438406786257, 0), z_dir=(0, 0, 1))) as fillet1_piece_7:
        with BuildLine():
            CenterArc((0.190116062, 0.499021286), FILLET1_R, 228.585513432, 37.828973137)
            Line((-0.140634689, 0.124049366), (0, 0))
            ThreePointArc((0, 0), (0.079423486, 0.002485933), (0.158846972, 0))
        make_face()
    extrude(amount=2.537634803, mode=Mode.SUBTRACT)
    with BuildSketch(Plane(origin=(47.788196764, 41.015423319, -1.280506532), x_dir=(-0.796757139689439, 0.6042996445091655, 0), z_dir=(0, 0, 1)), Plane(origin=(-47.788196764, -41.015423319, -1.280506532), x_dir=(0.796757139689439, -0.6042996445091655, 0), z_dir=(0, 0, 1))) as fillet1_piece_8:
        with BuildLine():
            CenterArc((0.384151959, 0.483324974), FILLET1_R, 201.96594505, 82.872907469)
            ThreePointArc((-0.079551214, 0.296297256), (-0.030795766, 0.150559576), (0, 0))
            ThreePointArc((0, 0), (0.256101306, -0.033350053), (0.512202613, 0))
        make_face()
    extrude(amount=4.161013063, mode=Mode.SUBTRACT)
    with BuildSketch(Plane(origin=(47.788196764, -41.015423319, -1.280506532), x_dir=(-0.3770302508373224, 0.9262009446948031, 0), z_dir=(0, 0, 1)), Plane(origin=(-47.788196764, 41.015423319, -1.280506532), x_dir=(0.3770302508373224, -0.9262009446948031, 0), z_dir=(0, 0, 1))) as fillet1_piece_9:
        with BuildLine():
            CenterArc((0.367182425, 0.496339425), FILLET1_R, 180.189758693, 82.872907469)
            ThreePointArc((-0.132814833, 0.494683471), (-0.098616779, 0.238694022), (0, 0))
            ThreePointArc((0, 0), (0.153395289, 0.00929786), (0.306790579, 0))
        make_face()
    extrude(amount=4.161013063, mode=Mode.SUBTRACT)

    # M2 Clearance Hole1 (through all)
    with Locations(Plane(origin=(0, 0, 0), x_dir=(-1, 0, 0), z_dir=(0, 0, -1))):
        with Locations((50.5, -27.5), (27.5, -50.5), (-50.5, -27.5), (-27.5, -50.5), (-27.5, 50.5), (-50.5, 27.5), (27.5, 50.5), (50.5, 27.5)):
            Hole(M2_CLEARANCE_HOLE1_D / 2)

    # Sketch12 → interboardConnectorHoles (cut, two sides: drawn at the far end of the back side and taken through both)
    with BuildSketch(Plane.XY.offset(1.6).offset(-INTERBOARDCONNECTORHOLES_DEPTH_BACK)):
        with Locations((27.815, -42.5)):
            Circle(SKETCH12_R)
        with Locations((38.585, -42.5)):
            Circle(SKETCH12_R)
    extrude(amount=INTERBOARDCONNECTORHOLES_DEPTH + INTERBOARDCONNECTORHOLES_DEPTH_BACK, mode=Mode.SUBTRACT)

    # Sketch17 → Cut-Extrude7 (cut, two sides: drawn at the far end of the back side and taken through both)
    with BuildSketch(Plane.XY.offset(1.6).offset(-CUT_EXTRUDE7_DEPTH_BACK)):
        with Locations((-28.9, -42.5)):
            Rectangle(SKETCH17_W, SKETCH17_H)
    extrude(amount=CUT_EXTRUDE7_DEPTH + CUT_EXTRUDE7_DEPTH_BACK, mode=Mode.SUBTRACT)

    # Fillet2
    fillet2_edges = [part.edges().sort_by_distance(p)[0] for p in [
        (-35.9, -45, 0.8),
        (-35.9, -40, 0.8),
        (-21.9, -40, 0.8),
        (-21.9, -45, 0.8),
    ]]
    fillet(fillet2_edges, radius=FILLET2_R)

    # Sketch10 → Cut-Extrude1 (cut, two sides: drawn at the far end of the back side and taken through both)
    with BuildSketch(Plane(origin=(0, 0, 0), x_dir=(-1, 0, 0), z_dir=(0, 0, -1)).offset(-CUT_EXTRUDE1_DEPTH_BACK)):
        Circle(SKETCH10_R)
    extrude(amount=CUT_EXTRUDE1_DEPTH + CUT_EXTRUDE1_DEPTH_BACK, mode=Mode.SUBTRACT)

    # Sketch16 → Cut-Extrude6 (cut)
    with BuildSketch(Plane.XY.offset(1.6)):
        with Locations((0, -49.9)):
            Rectangle(SKETCH16_W, SKETCH16_H)
        with Locations((0, 49.9)):
            Rectangle(SKETCH16_W, SKETCH16_H)
        with Locations((-50.4, 0)):
            Rectangle(SKETCH16_W_2, SKETCH16_H_2)
        with Locations((50.4, 0)):
            Rectangle(SKETCH16_W_2, SKETCH16_H_2)
    extrude(amount=-CUT_EXTRUDE6_DEPTH, mode=Mode.SUBTRACT)


solid = part.part
